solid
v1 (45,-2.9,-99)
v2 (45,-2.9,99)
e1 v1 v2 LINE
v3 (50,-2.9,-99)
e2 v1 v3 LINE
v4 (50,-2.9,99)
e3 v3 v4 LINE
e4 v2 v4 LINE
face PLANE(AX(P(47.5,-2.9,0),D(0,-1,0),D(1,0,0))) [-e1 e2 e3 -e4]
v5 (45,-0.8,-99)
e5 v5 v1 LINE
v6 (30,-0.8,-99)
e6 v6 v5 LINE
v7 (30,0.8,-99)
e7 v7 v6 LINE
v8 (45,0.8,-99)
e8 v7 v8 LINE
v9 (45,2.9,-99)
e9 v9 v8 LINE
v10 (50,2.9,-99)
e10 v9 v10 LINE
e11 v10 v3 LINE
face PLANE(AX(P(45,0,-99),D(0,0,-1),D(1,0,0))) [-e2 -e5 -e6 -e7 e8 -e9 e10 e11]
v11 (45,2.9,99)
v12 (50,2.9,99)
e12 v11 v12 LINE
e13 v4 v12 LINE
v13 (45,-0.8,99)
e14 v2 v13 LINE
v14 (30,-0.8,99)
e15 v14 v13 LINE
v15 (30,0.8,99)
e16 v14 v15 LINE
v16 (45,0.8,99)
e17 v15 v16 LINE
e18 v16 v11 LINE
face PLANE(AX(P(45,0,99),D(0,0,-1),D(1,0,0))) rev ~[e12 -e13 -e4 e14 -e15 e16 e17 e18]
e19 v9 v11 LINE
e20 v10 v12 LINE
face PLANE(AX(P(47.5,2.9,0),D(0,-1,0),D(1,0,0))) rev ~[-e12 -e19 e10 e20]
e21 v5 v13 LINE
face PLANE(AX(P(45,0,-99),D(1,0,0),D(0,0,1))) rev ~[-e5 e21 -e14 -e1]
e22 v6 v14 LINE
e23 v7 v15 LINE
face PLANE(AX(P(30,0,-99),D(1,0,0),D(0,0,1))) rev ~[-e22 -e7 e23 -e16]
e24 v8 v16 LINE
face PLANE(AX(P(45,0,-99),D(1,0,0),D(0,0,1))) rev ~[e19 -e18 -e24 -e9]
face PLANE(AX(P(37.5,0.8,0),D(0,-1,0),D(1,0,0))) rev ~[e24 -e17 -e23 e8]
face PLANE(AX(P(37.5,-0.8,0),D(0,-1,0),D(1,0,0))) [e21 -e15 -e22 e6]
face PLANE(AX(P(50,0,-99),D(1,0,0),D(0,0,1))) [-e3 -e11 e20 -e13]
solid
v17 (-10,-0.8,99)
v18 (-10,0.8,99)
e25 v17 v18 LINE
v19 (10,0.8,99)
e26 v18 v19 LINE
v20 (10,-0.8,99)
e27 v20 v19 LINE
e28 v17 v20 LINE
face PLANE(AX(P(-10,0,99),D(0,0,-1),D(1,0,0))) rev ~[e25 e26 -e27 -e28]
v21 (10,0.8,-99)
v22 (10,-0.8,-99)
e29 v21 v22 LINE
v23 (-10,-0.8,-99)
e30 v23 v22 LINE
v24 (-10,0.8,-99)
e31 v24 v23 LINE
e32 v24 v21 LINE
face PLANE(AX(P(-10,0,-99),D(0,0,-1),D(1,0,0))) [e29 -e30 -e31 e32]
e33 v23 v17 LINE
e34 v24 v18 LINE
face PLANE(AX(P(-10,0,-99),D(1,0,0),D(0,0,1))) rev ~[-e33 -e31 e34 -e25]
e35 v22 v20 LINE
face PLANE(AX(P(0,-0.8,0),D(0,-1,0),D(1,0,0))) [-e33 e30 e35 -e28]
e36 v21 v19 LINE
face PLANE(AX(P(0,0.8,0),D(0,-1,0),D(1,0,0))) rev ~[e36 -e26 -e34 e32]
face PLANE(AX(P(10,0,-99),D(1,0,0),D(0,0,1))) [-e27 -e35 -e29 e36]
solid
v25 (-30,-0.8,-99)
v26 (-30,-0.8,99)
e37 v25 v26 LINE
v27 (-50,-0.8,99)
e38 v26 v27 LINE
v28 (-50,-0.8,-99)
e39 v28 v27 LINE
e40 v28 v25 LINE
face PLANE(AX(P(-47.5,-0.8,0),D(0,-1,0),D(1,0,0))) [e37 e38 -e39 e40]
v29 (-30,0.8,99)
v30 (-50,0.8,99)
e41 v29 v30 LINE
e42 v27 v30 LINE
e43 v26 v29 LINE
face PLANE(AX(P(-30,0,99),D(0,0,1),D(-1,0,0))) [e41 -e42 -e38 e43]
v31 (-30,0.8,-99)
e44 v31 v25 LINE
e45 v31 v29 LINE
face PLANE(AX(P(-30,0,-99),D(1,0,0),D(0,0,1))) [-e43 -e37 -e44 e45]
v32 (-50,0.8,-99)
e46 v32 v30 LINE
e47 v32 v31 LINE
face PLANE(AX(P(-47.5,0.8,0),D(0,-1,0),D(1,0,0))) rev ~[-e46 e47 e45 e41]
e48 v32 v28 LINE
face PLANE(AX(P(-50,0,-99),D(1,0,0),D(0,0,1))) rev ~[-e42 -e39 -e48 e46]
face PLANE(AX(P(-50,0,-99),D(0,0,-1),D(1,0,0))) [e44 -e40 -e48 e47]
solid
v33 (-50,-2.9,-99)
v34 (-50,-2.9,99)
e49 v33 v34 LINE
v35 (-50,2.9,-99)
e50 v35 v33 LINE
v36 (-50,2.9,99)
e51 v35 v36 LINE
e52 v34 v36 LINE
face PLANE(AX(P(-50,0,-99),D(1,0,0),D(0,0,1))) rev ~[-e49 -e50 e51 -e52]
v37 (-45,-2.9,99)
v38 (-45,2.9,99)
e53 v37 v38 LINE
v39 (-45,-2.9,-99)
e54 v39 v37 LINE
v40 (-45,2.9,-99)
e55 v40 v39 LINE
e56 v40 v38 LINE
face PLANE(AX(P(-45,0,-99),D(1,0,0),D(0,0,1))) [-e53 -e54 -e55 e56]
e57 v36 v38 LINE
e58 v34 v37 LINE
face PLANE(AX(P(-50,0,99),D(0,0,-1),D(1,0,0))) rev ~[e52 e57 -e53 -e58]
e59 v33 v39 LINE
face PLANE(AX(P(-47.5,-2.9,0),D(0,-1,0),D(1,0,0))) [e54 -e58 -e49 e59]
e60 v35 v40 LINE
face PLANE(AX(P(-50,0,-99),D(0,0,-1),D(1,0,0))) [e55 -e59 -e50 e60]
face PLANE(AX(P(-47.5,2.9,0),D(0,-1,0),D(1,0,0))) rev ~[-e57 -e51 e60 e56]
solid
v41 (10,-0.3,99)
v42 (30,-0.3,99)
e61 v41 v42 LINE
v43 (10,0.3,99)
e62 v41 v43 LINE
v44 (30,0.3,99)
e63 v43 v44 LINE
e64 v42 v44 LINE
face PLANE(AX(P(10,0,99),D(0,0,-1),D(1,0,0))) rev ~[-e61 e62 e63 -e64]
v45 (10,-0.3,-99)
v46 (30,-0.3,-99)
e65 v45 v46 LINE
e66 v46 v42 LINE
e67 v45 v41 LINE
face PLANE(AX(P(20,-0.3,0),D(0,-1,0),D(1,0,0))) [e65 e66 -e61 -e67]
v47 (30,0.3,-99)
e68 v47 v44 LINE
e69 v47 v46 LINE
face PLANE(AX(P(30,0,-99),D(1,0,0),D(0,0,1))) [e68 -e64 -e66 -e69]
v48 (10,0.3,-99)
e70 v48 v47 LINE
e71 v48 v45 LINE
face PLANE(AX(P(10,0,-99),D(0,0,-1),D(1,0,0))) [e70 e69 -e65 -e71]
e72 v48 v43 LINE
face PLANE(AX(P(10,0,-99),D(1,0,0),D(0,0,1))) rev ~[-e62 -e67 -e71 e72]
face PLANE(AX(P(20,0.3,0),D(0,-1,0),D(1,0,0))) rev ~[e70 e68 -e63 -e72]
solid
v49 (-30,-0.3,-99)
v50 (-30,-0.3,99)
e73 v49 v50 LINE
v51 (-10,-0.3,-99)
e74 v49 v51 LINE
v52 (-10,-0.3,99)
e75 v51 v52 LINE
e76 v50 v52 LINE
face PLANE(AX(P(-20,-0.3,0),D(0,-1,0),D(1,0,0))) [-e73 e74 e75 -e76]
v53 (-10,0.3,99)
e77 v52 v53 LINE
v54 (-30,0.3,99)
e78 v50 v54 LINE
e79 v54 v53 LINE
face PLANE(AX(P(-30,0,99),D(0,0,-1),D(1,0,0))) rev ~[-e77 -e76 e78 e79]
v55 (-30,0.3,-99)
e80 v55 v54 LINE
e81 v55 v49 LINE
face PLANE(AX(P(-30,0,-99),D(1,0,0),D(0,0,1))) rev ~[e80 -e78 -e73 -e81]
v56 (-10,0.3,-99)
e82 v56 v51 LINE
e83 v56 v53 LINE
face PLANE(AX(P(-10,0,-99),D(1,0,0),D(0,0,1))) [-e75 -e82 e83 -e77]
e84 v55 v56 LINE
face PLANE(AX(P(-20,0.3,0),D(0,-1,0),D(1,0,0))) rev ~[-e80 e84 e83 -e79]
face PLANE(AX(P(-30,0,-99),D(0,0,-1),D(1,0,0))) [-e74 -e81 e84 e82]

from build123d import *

# Parameters (mm, degrees)
F0_W     = 5
F0_H     = 198
F1_DEPTH = 2.9
F0_W_2   = 15
F2_DEPTH = 0.8
F0_W_3   = 20
F3_DEPTH = 0.3


with BuildPart() as f1:
    # F0 (on Front) → F1 (new body, symmetric)
    with BuildSketch(Plane.XZ):
        with Locations((47.5, 0)):
            Rectangle(F0_W, F0_H)
    extrude(amount=F1_DEPTH, both=True)

    # F0 (on Front) → F2 (join, symmetric)
    with BuildSketch(Plane.XZ):
        with Locations((37.5, 0)):
            Rectangle(F0_W_2, F0_H)
    extrude(amount=F2_DEPTH, both=True)


with BuildPart() as f1b:
    # F0 (on Front) → F1, piece 2 (new body, symmetric)
    with BuildSketch(Plane.XZ):
        with Locations((-47.5, 0)):
            Rectangle(F0_W, F0_H)
    extrude(amount=F1_DEPTH, both=True)


with BuildPart() as f2:
    # F0 (on Front) → F2, piece 2 (new body, symmetric)
    with BuildSketch(Plane.XZ):
        Rectangle(F0_W_3, F0_H)
    extrude(amount=F2_DEPTH, both=True)


with BuildPart() as f2b:
    # F0 (on Front) → F2, piece 3 (new body, symmetric)
    with BuildSketch(Plane.XZ):
        with Locations((-47.5, 0)):
            Rectangle(F0_W, F0_H)
        with Locations((-37.5, 0)):
            Rectangle(F0_W_2, F0_H)
    extrude(amount=F2_DEPTH, both=True)


with BuildPart() as f3:
    # F0 (on Front) → F3 (new body, symmetric)
    with BuildSketch(Plane.XZ):
        with Locations((-20, 0)):
            Rectangle(F0_W_3, F0_H)
    extrude(amount=F3_DEPTH, both=True)


with BuildPart() as f3b:
    # F0 (on Front) → F3, piece 2 (new body, symmetric)
    with BuildSketch(Plane.XZ):
        with Locations((20, 0)):
            Rectangle(F0_W_3, F0_H)
    extrude(amount=F3_DEPTH, both=True)


solid = Compound([f1.part, f1b.part, f2.part, f2b.part, f3.part, f3b.part])
